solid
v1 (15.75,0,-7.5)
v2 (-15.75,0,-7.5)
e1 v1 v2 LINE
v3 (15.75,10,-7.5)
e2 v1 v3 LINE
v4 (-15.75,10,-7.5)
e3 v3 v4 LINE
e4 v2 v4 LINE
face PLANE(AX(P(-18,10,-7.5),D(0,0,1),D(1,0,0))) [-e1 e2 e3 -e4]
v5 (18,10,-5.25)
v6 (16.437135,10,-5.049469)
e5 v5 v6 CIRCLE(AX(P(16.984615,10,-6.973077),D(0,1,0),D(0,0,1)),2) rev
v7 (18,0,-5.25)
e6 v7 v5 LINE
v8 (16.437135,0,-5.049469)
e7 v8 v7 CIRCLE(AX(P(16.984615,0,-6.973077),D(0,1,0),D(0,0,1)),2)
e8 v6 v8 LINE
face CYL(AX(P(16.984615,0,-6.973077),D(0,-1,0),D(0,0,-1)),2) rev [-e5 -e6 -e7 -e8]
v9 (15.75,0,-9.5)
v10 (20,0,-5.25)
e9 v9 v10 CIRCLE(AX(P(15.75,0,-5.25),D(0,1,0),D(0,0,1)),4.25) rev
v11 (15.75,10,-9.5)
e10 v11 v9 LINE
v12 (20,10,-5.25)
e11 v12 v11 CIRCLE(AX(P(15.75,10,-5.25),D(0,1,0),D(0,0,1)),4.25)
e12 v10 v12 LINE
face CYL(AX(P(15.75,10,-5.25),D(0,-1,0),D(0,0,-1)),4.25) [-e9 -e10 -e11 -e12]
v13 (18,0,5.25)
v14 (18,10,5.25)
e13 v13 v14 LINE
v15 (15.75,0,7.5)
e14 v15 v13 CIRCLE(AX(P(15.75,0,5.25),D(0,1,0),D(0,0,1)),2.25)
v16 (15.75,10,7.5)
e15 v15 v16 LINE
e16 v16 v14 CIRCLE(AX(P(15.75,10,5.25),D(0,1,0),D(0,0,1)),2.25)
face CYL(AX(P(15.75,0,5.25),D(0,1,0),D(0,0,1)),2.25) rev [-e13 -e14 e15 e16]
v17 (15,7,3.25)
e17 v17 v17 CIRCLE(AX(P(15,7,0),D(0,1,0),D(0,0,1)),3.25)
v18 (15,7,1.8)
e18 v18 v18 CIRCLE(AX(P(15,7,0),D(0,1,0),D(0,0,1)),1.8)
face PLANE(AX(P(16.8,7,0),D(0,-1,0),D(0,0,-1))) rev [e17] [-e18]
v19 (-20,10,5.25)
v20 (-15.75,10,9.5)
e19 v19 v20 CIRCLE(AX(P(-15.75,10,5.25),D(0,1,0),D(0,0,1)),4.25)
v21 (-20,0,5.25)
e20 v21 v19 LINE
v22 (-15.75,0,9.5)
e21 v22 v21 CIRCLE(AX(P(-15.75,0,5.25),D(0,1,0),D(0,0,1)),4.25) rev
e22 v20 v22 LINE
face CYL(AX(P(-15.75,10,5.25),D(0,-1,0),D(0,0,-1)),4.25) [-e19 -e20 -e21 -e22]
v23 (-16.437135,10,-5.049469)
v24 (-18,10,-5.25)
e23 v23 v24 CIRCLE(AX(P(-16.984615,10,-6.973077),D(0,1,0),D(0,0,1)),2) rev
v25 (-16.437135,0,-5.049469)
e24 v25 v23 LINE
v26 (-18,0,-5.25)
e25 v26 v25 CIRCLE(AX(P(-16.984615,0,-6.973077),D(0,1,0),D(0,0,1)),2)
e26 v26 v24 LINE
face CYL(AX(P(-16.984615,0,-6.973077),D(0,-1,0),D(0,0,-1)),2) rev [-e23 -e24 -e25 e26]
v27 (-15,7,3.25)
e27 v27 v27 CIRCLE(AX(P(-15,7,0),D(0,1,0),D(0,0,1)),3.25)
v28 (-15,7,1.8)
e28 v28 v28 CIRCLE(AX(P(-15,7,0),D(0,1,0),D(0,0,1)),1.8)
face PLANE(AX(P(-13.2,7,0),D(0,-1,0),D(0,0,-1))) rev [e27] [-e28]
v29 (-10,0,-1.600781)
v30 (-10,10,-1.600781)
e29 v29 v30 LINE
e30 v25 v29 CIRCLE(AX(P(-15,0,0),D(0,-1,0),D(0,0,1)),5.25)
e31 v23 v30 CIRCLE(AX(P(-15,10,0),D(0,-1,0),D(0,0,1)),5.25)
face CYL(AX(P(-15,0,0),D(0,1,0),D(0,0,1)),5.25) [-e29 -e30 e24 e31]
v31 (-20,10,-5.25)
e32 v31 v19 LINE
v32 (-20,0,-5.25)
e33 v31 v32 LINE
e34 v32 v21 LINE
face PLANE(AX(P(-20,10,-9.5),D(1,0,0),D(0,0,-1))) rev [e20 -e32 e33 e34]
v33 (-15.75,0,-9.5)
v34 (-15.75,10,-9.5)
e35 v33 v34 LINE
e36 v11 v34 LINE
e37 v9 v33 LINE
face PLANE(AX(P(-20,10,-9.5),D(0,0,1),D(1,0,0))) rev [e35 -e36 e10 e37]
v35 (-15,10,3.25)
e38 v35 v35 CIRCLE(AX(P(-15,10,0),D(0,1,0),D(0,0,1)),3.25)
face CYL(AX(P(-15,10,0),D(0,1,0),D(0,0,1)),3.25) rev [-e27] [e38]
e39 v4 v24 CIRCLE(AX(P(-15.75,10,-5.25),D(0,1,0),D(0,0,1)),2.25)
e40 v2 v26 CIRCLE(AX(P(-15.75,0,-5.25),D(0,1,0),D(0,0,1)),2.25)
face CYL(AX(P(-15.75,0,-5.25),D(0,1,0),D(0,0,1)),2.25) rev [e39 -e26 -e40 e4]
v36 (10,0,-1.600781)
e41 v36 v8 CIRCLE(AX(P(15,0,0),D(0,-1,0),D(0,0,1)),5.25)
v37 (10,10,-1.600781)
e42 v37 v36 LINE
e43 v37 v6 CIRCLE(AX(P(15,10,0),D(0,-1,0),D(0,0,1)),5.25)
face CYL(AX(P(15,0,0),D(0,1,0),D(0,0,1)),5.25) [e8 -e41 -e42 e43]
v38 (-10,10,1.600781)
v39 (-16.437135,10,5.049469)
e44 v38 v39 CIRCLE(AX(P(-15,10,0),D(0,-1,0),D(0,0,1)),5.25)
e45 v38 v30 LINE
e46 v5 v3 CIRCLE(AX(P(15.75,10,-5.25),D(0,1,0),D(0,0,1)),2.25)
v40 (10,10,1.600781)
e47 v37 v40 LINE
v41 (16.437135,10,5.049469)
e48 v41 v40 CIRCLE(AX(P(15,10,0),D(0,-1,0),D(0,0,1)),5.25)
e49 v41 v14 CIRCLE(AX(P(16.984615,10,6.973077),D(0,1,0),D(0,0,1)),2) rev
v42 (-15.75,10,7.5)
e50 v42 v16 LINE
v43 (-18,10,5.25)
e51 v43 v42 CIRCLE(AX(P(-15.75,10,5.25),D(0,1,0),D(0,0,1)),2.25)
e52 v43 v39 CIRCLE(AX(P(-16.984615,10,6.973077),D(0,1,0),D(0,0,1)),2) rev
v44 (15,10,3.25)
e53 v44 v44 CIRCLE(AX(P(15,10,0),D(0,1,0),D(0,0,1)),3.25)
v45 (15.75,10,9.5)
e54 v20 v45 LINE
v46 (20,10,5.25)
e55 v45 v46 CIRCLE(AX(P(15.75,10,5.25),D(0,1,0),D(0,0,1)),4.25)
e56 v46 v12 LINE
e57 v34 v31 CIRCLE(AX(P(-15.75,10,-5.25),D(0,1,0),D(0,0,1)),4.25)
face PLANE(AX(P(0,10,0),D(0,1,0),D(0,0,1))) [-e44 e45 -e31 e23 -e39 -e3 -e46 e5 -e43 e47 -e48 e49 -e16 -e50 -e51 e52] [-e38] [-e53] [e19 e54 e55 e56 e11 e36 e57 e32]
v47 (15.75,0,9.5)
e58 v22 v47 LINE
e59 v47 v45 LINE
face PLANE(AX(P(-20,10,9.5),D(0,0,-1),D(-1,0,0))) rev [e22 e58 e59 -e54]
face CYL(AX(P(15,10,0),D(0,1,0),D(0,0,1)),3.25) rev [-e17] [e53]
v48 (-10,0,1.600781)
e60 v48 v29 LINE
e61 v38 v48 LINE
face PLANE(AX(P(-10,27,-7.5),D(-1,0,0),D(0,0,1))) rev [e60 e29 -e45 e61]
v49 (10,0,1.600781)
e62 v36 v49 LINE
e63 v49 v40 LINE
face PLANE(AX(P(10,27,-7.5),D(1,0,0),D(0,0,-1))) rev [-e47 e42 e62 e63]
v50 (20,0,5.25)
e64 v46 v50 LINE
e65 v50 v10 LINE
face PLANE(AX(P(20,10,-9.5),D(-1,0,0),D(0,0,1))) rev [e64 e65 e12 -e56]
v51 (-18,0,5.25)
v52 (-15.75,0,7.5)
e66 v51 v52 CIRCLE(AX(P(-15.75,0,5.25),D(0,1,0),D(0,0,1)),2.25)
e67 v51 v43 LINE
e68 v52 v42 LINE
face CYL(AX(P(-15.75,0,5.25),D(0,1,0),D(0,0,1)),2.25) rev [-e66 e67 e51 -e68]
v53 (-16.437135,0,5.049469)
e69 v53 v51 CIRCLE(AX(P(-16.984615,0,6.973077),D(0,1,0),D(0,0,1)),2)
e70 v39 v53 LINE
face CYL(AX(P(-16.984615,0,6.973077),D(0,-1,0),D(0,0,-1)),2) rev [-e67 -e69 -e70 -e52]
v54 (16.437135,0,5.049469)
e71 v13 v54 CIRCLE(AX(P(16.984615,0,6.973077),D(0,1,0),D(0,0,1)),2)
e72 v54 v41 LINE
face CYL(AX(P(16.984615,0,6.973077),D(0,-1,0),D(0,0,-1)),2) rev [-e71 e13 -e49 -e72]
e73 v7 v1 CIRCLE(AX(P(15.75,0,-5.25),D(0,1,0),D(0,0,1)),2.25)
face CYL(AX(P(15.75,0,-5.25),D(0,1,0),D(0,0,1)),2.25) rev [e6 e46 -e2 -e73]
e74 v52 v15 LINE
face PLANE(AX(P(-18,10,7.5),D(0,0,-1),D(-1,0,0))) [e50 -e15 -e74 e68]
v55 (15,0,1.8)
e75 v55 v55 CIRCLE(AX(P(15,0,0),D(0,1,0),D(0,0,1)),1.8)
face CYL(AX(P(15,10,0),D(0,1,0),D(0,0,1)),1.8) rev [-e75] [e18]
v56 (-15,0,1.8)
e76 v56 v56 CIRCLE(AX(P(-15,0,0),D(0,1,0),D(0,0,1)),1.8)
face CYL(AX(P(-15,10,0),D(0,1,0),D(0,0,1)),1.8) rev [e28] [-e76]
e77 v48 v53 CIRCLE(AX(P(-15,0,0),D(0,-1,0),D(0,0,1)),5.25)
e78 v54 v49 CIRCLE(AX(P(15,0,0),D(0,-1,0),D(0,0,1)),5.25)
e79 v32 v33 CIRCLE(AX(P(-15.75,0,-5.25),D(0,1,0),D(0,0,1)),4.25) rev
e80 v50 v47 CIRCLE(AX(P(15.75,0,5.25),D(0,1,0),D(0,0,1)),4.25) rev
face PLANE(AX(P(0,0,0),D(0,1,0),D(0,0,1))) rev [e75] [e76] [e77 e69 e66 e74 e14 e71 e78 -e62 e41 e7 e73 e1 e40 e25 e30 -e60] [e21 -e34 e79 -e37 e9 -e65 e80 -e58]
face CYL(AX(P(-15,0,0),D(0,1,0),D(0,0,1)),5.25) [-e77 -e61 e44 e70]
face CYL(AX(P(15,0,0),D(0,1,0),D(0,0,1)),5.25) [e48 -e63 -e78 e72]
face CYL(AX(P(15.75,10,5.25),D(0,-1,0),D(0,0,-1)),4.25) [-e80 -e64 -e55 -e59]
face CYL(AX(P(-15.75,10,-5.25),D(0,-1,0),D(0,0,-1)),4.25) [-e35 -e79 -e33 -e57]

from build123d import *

# Parameters (mm, degrees)
SKETCH1_W                      = 40
SKETCH1_H                      = 19
SKETCH1_W_2                    = 36
SKETCH1_H_2                    = 15
BOSS_EXTRUDE1_DEPTH            = 10
FILLET1_R                      = 4.25
BOSS_EXTRUDE2_START            = 10
BOSS_EXTRUDE2_DEPTH            = 10
CBORE_FOR_M3_SHCS1_D           = 3.6
CBORE_FOR_M3_SHCS1_CBORE_D     = 6.5
CBORE_FOR_M3_SHCS1_CBORE_DEPTH = 3
CUT_EXTRUDE1_DEPTH             = 25.295061227
FILLET2_R                      = 2


with BuildPart() as part:
    # Sketch1 → Boss-Extrude1 (new body)
    with BuildSketch(Plane(origin=(0, 0, 0), x_dir=(1, 0, 0), z_dir=(0, 1, 0))):
        Rectangle(SKETCH1_W, SKETCH1_H)
        Rectangle(SKETCH1_W_2, SKETCH1_H_2, mode=Mode.SUBTRACT)
    extrude(amount=BOSS_EXTRUDE1_DEPTH)

    # Fillet1
    fillet1_edges = [part.edges().sort_by_distance(p)[0] for p in [
        (-18, 5, -7.5),
        (-18, 5, 7.5),
        (18, 5, 7.5),
        (18, 5, -7.5),
        (20, 5, 9.5),
        (-20, 5, 9.5),
        (-20, 5, -9.5),
        (20, 5, -9.5),
    ]]
    fillet(fillet1_edges, radius=FILLET1_R)

    # Sketch2 → Boss-Extrude2 (add)
    with BuildSketch(Plane(origin=(0, 0, 0), x_dir=(1, 0, 0), z_dir=(0, 1, 0)).offset(BOSS_EXTRUDE2_START)):
        with BuildLine():
            Line((18, -3.25), (18, 3.25))
            ThreePointArc((18, 3.25), (16.75520382, 6.25520382), (13.75, 7.5))
            Line((13.75, 7.5), (10, 7.5))
            Line((10, 7.5), (10, -7.5))
            Line((10, -7.5), (13.75, -7.5))
            ThreePointArc((13.75, -7.5), (16.75520382, -6.25520382), (18, -3.25))
        make_face()
        with BuildLine():
            Line((-13.75, -7.5), (-10, -7.5))
            Line((-10, -7.5), (-10, 7.5))
            Line((-10, 7.5), (-13.75, 7.5))
            ThreePointArc((-13.75, 7.5), (-16.75520382, 6.25520382), (-18, 3.25))
            Line((-18, 3.25), (-18, -3.25))
            ThreePointArc((-18, -3.25), (-16.75520382, -6.25520382), (-13.75, -7.5))
        make_face()
    extrude(amount=-BOSS_EXTRUDE2_DEPTH)

    # CBORE for M3 SHCS1 (through all)
    with Locations(Plane(origin=(0, 10, 0), x_dir=(1, 0, 0), z_dir=(0, 1, 0))):
        with Locations((-15, 0), (15, 0)):
            CounterBoreHole(CBORE_FOR_M3_SHCS1_D / 2, CBORE_FOR_M3_SHCS1_CBORE_D / 2, CBORE_FOR_M3_SHCS1_CBORE_DEPTH)

    # Sketch5 → Cut-Extrude1 (cut, through all)
    with BuildSketch(Plane(origin=(0, 10, 0), x_dir=(1, 0, 0), z_dir=(0, 1, 0))):
        with BuildLine():
            Line((15.75, 7.5), (-15.75, 7.5))
            ThreePointArc((-15.75, 7.5), (-17.340990258, 6.840990258), (-18, 5.25))
            Line((-18, 5.25), (-18, 4.308421985))
            ThreePointArc((-18, 4.308421985), (-9.75, 0), (-18, -4.308421985))
            Line((-18, -4.308421985), (-18, -5.25))
            ThreePointArc((-18, -5.25), (-17.340990258, -6.840990258), (-15.75, -7.5))
            Line((-15.75, -7.5), (15.75, -7.5))
            ThreePointArc((15.75, -7.5), (17.340990258, -6.840990258), (18, -5.25))
            Line((18, -5.25), (18, -4.308421985))
            ThreePointArc((18, -4.308421985), (9.75, 0), (18, 4.308421985))
            Line((18, 4.308421985), (18, 5.25))
            ThreePointArc((18, 5.25), (17.340990258, 6.840990258), (15.75, 7.5))
        make_face()
    extrude(amount=-CUT_EXTRUDE1_DEPTH, mode=Mode.SUBTRACT)

    # Fillet2
    # the kernel refuses this fillet: 2 mm, written as the material it adds along each edge
    with BuildSketch(Plane(origin=(18, 10, 4.308421985), x_dir=(-0.9035715432909278, 0, 0.42843723712447174), z_dir=(0, -1, 0)), Plane(origin=(-18, 10, -4.308421985), x_dir=(0.9035715432909261, 0, -0.4284372371244754), z_dir=(0, -1, 0))) as fillet2_piece_1:
        with BuildLine():
            CenterArc((2.059110044, -1.972677796), FILLET2_R, 99.481480479, 46.397181027)
            Line((0.403407083, -0.8507831), (0.370293024, -0.828345206))
            ThreePointArc((0.370293024, -0.828345206), (0.16556068, -0.44252904), (-0.036142862, -0.017137489))
            Line((-0.036142862, -0.017137489), (0.006589152, 0.039453556))
            ThreePointArc((0.006589152, 0.039453556), (0.864826218, -0.031720787), (1.723063284, 0.039453556))
            Line((1.723063284, 0.039453556), (1.729652437, 0))
        make_face()
    extrude(amount=10)
    with BuildSketch(Plane(origin=(18, 10, -4.308421985), x_dir=(0, 0, -1), z_dir=(0, -1, 0)), Plane(origin=(-18, 10, 4.308421985), x_dir=(0, 0, 1), z_dir=(0, -1, 0))) as fillet2_piece_2:
        with BuildLine():
            CenterArc((2.664654938, -1.015384615), FILLET2_R, 149.489762594, 46.397181027)
            Line((0.741047511, -1.562864721), (0.702575363, -1.573814324))
            ThreePointArc((0.702575363, -1.573814324), (0.399185756, -0.767841995), (-0.032826072, -0.022857143))
            Line((-0.032826072, -0.022857143), (0, 0.04))
            ThreePointArc((0, 0.04), (0.470789008, 0.04), (0.907116477, 0.020307692))
            Line((0.907116477, 0.020307692), (0.941578015, 0))
        make_face()
    extrude(amount=10)


solid = part.part
